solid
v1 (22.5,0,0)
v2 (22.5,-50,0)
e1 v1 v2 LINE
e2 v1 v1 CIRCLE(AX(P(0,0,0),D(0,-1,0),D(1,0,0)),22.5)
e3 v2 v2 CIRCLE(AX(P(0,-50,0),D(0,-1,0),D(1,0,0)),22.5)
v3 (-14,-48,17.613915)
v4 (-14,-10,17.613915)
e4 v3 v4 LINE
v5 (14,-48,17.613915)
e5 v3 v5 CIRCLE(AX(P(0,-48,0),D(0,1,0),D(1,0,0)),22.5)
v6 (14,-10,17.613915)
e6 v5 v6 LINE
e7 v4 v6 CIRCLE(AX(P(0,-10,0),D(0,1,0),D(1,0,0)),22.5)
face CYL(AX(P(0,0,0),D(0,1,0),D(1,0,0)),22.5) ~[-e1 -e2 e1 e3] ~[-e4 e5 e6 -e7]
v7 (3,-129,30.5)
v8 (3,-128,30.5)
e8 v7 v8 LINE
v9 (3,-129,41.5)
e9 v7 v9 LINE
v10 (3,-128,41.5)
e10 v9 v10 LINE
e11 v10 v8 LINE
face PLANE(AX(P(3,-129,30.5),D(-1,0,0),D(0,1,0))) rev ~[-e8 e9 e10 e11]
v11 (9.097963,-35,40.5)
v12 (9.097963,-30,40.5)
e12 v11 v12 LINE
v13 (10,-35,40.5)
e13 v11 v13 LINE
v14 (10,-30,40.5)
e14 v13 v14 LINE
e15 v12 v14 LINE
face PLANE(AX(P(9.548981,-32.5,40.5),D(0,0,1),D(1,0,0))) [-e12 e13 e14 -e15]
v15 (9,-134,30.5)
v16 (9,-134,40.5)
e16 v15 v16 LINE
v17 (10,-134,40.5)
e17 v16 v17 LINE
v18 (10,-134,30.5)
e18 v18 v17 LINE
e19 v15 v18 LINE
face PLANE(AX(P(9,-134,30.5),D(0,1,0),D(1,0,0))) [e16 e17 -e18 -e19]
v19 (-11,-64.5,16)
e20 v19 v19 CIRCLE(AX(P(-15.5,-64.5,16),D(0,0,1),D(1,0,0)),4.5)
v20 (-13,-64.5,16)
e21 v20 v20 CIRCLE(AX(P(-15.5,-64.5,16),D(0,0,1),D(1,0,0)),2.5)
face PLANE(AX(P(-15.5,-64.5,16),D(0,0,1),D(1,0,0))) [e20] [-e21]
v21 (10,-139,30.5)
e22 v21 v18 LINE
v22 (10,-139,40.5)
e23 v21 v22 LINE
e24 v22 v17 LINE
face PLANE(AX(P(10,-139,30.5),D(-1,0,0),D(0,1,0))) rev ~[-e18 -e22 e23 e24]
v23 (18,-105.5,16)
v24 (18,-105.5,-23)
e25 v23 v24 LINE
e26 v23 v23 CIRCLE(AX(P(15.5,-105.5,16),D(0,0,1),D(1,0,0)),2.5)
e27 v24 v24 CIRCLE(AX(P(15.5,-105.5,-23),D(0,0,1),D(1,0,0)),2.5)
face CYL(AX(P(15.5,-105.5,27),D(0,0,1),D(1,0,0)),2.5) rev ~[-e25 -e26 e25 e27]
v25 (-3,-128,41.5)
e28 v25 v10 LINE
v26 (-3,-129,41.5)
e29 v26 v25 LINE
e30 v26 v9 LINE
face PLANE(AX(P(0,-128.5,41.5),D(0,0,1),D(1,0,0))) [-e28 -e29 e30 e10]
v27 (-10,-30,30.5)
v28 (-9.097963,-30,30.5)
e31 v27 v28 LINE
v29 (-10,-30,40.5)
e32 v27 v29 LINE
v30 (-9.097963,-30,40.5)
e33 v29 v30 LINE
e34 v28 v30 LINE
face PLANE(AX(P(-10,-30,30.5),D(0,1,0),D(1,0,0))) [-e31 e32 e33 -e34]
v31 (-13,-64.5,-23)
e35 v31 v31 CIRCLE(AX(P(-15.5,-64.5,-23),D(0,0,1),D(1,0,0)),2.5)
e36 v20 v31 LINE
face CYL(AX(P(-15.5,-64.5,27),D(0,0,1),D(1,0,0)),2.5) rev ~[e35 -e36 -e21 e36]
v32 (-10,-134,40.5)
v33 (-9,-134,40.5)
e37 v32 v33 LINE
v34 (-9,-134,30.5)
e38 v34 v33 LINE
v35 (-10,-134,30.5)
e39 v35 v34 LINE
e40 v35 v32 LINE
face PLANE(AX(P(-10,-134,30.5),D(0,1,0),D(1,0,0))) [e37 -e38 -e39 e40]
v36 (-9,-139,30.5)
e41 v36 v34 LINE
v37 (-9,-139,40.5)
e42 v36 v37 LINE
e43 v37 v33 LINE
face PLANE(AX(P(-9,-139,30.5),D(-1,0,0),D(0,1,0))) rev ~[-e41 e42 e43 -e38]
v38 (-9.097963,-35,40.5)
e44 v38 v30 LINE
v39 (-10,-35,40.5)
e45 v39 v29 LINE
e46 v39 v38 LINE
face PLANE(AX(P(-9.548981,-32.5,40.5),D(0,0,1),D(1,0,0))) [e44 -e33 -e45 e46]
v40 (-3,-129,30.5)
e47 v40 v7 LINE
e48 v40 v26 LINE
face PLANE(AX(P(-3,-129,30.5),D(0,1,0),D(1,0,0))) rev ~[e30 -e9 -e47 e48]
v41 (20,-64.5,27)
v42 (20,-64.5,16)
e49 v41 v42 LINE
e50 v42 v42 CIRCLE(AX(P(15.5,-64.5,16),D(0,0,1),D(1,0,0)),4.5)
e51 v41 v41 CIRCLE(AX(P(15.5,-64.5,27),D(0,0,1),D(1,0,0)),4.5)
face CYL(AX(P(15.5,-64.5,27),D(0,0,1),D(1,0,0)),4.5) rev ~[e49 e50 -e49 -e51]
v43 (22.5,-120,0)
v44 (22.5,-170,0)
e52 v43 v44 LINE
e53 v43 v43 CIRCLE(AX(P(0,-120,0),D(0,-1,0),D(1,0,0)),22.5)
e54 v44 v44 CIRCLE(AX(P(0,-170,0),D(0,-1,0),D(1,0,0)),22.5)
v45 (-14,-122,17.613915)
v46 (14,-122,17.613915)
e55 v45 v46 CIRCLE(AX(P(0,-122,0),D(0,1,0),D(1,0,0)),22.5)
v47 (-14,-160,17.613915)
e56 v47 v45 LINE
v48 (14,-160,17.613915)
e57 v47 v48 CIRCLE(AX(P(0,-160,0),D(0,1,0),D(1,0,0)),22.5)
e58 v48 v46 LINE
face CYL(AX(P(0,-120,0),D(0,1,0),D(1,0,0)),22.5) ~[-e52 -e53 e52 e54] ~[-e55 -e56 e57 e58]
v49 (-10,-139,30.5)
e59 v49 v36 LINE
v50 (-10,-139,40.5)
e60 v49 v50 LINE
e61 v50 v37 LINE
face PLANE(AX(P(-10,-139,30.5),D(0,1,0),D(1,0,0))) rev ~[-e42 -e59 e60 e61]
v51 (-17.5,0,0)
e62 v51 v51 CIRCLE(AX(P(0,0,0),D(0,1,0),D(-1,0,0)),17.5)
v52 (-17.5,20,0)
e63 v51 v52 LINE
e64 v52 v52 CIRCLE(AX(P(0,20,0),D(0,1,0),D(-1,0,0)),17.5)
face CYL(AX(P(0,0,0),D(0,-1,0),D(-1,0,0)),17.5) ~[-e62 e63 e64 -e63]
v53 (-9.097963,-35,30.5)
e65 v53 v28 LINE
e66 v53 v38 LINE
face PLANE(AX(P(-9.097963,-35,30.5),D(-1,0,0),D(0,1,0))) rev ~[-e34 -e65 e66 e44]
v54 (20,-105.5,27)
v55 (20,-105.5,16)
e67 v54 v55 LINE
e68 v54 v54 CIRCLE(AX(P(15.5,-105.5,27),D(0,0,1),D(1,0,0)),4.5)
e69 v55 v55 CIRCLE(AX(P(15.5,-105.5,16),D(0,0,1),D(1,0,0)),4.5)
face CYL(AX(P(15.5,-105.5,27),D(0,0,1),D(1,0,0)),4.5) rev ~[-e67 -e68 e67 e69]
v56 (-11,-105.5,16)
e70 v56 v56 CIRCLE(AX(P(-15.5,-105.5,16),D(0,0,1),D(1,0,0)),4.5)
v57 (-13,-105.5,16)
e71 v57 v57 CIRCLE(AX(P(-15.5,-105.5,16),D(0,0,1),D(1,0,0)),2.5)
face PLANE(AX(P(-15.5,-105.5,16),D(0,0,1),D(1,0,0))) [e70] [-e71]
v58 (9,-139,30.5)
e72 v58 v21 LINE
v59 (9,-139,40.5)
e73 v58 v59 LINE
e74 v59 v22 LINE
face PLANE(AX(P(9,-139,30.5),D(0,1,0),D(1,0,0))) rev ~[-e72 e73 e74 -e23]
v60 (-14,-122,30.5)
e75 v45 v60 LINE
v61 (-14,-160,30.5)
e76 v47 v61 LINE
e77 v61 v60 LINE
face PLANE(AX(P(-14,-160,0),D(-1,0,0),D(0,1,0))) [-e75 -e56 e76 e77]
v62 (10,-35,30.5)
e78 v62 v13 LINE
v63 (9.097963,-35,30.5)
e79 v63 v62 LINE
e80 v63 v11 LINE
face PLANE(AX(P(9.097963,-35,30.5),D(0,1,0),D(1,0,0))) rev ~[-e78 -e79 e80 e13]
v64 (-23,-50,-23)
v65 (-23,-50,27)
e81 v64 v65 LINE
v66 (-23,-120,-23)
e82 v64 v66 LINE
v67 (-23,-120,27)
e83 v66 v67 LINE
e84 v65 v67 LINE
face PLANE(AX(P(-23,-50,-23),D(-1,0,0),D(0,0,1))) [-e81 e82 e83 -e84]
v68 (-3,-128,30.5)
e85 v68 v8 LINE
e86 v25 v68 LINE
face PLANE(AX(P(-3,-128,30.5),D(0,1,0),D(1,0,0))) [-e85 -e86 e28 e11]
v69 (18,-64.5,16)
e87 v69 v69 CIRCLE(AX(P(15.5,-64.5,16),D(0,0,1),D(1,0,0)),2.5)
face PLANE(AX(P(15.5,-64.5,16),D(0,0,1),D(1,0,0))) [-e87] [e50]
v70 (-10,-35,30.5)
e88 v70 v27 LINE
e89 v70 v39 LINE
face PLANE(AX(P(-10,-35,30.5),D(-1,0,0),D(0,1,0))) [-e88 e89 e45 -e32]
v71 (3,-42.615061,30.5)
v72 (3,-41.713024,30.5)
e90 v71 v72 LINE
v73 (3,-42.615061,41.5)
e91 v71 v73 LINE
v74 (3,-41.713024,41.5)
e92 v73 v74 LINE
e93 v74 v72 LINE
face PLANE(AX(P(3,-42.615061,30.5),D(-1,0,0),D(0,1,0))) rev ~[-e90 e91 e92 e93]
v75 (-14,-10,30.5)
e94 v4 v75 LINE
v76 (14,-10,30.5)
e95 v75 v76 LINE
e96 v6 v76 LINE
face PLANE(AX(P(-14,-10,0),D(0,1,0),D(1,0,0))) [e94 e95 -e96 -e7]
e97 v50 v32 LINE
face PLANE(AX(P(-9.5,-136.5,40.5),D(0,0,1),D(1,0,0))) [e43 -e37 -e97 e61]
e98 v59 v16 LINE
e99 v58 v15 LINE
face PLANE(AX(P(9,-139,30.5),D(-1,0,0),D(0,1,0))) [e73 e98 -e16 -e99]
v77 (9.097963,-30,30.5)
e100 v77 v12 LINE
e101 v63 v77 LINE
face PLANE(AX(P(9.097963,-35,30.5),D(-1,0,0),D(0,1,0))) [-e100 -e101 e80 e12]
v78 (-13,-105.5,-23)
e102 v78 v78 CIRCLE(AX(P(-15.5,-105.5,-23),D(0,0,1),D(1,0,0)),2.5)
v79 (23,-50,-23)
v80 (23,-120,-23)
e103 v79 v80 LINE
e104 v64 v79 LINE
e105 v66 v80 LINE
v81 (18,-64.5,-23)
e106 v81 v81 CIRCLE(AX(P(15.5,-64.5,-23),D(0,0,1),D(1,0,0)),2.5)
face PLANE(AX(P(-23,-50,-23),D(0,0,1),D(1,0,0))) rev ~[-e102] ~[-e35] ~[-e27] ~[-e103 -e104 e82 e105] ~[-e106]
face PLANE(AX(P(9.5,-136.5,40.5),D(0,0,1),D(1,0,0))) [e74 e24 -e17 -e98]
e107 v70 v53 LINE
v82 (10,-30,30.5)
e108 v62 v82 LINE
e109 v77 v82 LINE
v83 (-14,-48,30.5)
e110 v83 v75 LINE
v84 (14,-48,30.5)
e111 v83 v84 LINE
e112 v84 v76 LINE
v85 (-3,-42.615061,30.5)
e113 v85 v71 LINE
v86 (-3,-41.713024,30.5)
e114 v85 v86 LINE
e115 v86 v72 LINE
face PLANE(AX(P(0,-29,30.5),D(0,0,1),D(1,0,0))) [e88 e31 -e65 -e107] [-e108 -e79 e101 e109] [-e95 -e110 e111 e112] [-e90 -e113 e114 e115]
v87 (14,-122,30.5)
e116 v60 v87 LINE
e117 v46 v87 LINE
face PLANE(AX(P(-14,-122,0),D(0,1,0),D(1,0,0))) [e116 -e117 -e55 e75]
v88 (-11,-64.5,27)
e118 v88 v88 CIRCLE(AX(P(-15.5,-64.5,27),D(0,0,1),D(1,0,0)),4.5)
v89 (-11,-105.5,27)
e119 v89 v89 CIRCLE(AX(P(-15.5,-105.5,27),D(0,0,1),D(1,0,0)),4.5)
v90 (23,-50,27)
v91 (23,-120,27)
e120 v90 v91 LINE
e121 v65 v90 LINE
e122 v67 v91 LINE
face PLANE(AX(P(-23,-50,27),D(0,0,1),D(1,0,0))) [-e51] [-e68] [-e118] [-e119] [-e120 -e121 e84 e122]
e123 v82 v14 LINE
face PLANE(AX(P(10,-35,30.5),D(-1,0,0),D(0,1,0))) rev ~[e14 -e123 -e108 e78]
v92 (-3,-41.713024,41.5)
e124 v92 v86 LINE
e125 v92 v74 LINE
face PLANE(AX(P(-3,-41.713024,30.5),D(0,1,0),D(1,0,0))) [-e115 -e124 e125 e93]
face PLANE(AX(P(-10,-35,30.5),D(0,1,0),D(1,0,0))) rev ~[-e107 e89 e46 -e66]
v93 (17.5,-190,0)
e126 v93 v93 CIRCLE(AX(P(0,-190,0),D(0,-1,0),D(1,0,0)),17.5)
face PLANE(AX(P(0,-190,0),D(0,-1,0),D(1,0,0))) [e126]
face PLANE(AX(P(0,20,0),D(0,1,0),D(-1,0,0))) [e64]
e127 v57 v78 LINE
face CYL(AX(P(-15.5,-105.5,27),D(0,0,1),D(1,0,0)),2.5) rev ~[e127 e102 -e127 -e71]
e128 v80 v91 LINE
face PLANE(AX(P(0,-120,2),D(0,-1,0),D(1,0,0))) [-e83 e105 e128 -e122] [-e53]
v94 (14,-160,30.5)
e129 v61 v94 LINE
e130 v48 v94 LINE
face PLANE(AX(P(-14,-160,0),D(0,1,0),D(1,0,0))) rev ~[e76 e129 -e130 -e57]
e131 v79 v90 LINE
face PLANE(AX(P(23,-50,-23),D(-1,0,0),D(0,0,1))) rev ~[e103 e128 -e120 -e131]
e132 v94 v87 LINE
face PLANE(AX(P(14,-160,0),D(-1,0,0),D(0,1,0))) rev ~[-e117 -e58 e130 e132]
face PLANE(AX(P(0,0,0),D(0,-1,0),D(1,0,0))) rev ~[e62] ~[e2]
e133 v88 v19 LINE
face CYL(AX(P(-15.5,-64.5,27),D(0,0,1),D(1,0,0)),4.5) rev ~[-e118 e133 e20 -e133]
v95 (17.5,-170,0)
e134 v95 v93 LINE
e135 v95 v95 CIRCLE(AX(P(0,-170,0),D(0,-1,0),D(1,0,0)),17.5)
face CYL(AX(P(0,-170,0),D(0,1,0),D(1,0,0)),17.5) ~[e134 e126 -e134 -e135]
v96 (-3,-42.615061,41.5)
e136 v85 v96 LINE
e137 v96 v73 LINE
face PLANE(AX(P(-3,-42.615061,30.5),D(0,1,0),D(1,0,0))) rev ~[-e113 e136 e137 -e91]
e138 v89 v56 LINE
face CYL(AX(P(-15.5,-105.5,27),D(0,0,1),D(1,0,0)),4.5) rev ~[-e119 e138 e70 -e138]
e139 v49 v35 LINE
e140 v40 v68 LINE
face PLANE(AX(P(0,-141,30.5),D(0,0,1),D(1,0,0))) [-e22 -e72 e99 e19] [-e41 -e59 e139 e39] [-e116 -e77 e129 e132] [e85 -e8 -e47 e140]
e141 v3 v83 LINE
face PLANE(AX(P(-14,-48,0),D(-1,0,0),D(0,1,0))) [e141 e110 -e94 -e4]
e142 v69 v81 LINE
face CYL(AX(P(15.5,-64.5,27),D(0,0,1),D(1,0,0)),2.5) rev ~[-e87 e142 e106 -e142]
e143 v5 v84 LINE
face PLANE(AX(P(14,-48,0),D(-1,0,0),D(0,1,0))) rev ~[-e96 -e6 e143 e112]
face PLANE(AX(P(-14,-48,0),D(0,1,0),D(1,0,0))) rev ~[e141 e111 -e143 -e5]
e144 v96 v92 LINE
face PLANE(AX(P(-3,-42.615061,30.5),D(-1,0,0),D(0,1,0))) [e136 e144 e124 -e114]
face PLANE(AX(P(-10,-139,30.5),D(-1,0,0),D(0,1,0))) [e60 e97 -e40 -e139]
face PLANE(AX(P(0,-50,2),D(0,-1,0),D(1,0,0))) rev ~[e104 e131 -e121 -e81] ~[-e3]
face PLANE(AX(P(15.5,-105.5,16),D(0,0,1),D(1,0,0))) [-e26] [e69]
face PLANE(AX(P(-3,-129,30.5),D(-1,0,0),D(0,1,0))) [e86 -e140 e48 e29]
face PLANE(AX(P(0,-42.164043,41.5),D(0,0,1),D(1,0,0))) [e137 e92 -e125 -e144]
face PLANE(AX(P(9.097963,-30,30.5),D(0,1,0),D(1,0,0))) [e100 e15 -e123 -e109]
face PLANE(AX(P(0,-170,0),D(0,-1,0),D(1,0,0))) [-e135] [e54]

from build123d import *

# Parameters (mm, degrees)
F0_R      = 22.5
F1_DEPTH  = 50
F2_W      = 46
F2_H      = 50
F2_R      = 22.5
F3_DEPTH  = 70
F4_R      = 22.5
F5_DEPTH  = 50
F6_R      = 17.5
F7_DEPTH  = 20
F8_R      = 17.5
F9_DEPTH  = 20
F10_W     = 28
F10_H     = 38
F11_DEPTH = 30.5
F12_W     = 28
F12_H     = 38
F13_DEPTH = 30.5
F15_R     = 2.5
F16_DEPTH = 50
F14_R     = 4.5
F17_DEPTH = 11
F18_W     = 6
F18_H     = 0.9020372182
F19_DEPTH = 11
F20_W     = 6
F20_H     = 1
F21_DEPTH = 11
F20_W_2   = 1
F20_H_2   = 5
F22_DEPTH = 10
F18_W_2   = 0.9020372182
F18_H_2   = 5
F23_DEPTH = 10


# Not quite as in the source:
# - a feature names something its author has since deleted; it is built from what else it names


with BuildPart() as f1:
    # F0 (on Front) → F1 (new body)
    with BuildSketch(Plane.XZ):
        Circle(F0_R)
    extrude(amount=F1_DEPTH)

    # F2 (on face) → F3 (join)
    with BuildSketch(Plane.XZ.offset(50)):
        with Locations((0, 2)):
            Rectangle(F2_W, F2_H)
        Circle(F2_R, mode=Mode.SUBTRACT)
        Circle(F2_R)
    extrude(amount=F3_DEPTH)

    # F4 (on face) → F5 (join)
    with BuildSketch(Plane.XZ.offset(120)):
        Circle(F4_R)
    extrude(amount=F5_DEPTH)

    # F6 (on face) → F7 (join)
    with BuildSketch(Plane.XZ.offset(170)):
        Circle(F6_R)
    extrude(amount=F7_DEPTH)

    # F8 (on face) → F9 (join)
    with BuildSketch(Plane(origin=(0, 0, 0), x_dir=(-1, 0, 0), z_dir=(0, 1, 0))):
        Circle(F8_R)
    extrude(amount=F9_DEPTH)

    # F10 (on Top) → F11 (join)
    with BuildSketch(Plane.XY):
        with Locations((0, -29)):
            Rectangle(F10_W, F10_H)
    extrude(amount=F11_DEPTH)

    # F12 (on Top) → F13 (join)
    with BuildSketch(Plane.XY):
        with Locations((0, -141)):
            Rectangle(F12_W, F12_H)
    extrude(amount=F13_DEPTH)

    # F15 (on face) → F16 (cut)
    with BuildSketch(Plane.XY.offset(27)):
        with Locations((-15.5, -64.5)):
            Circle(F15_R)
        with Locations((-15.5, -105.5)):
            Circle(F15_R)
        with Locations((15.5, -105.5)):
            Circle(F15_R)
        with Locations((15.5, -64.5)):
            Circle(F15_R)
    extrude(amount=-F16_DEPTH, mode=Mode.SUBTRACT)

    # F14 (on face) → F17 (cut)
    with BuildSketch(Plane.XY.offset(27)):
        with Locations((-15.5, -64.5)):
            Circle(F14_R)
        with Locations((15.5, -64.5)):
            Circle(F14_R)
        with Locations((15.5, -105.5)):
            Circle(F14_R)
        with Locations((-15.5, -105.5)):
            Circle(F14_R)
    extrude(amount=-F17_DEPTH, mode=Mode.SUBTRACT)

    # F18 (on face) → F19 (join)
    with BuildSketch(Plane.XY.offset(30.5)):
        with Locations((0, -42.164042592)):
            Rectangle(F18_W, F18_H)
    extrude(amount=F19_DEPTH)

    # F20 (on face) → F21 (join)
    with BuildSketch(Plane.XY.offset(30.5)):
        with Locations((0, -128.5)):
            Rectangle(F20_W, F20_H)
    extrude(amount=F21_DEPTH)

    # F20 (on face) → F22 (join)
    with BuildSketch(Plane.XY.offset(30.5)):
        with Locations((9.5, -136.5)):
            Rectangle(F20_W_2, F20_H_2)
        with Locations((0, -128.5)):
            Rectangle(F20_W, F20_H)
        with Locations((-9.5, -136.5)):
            Rectangle(F20_W_2, F20_H_2)
    extrude(amount=F22_DEPTH)

    # F18 (on face) → F23 (join)
    with BuildSketch(Plane.XY.offset(30.5)):
        with Locations((-9.5489813909, -32.5)):
            Rectangle(F18_W_2, F18_H_2)
        with Locations((9.5489813909, -32.5)):
            Rectangle(F18_W_2, F18_H_2)
        with Locations((0, -42.164042592)):
            Rectangle(F18_W, F18_H)
    extrude(amount=F23_DEPTH)


solid = f1.part
